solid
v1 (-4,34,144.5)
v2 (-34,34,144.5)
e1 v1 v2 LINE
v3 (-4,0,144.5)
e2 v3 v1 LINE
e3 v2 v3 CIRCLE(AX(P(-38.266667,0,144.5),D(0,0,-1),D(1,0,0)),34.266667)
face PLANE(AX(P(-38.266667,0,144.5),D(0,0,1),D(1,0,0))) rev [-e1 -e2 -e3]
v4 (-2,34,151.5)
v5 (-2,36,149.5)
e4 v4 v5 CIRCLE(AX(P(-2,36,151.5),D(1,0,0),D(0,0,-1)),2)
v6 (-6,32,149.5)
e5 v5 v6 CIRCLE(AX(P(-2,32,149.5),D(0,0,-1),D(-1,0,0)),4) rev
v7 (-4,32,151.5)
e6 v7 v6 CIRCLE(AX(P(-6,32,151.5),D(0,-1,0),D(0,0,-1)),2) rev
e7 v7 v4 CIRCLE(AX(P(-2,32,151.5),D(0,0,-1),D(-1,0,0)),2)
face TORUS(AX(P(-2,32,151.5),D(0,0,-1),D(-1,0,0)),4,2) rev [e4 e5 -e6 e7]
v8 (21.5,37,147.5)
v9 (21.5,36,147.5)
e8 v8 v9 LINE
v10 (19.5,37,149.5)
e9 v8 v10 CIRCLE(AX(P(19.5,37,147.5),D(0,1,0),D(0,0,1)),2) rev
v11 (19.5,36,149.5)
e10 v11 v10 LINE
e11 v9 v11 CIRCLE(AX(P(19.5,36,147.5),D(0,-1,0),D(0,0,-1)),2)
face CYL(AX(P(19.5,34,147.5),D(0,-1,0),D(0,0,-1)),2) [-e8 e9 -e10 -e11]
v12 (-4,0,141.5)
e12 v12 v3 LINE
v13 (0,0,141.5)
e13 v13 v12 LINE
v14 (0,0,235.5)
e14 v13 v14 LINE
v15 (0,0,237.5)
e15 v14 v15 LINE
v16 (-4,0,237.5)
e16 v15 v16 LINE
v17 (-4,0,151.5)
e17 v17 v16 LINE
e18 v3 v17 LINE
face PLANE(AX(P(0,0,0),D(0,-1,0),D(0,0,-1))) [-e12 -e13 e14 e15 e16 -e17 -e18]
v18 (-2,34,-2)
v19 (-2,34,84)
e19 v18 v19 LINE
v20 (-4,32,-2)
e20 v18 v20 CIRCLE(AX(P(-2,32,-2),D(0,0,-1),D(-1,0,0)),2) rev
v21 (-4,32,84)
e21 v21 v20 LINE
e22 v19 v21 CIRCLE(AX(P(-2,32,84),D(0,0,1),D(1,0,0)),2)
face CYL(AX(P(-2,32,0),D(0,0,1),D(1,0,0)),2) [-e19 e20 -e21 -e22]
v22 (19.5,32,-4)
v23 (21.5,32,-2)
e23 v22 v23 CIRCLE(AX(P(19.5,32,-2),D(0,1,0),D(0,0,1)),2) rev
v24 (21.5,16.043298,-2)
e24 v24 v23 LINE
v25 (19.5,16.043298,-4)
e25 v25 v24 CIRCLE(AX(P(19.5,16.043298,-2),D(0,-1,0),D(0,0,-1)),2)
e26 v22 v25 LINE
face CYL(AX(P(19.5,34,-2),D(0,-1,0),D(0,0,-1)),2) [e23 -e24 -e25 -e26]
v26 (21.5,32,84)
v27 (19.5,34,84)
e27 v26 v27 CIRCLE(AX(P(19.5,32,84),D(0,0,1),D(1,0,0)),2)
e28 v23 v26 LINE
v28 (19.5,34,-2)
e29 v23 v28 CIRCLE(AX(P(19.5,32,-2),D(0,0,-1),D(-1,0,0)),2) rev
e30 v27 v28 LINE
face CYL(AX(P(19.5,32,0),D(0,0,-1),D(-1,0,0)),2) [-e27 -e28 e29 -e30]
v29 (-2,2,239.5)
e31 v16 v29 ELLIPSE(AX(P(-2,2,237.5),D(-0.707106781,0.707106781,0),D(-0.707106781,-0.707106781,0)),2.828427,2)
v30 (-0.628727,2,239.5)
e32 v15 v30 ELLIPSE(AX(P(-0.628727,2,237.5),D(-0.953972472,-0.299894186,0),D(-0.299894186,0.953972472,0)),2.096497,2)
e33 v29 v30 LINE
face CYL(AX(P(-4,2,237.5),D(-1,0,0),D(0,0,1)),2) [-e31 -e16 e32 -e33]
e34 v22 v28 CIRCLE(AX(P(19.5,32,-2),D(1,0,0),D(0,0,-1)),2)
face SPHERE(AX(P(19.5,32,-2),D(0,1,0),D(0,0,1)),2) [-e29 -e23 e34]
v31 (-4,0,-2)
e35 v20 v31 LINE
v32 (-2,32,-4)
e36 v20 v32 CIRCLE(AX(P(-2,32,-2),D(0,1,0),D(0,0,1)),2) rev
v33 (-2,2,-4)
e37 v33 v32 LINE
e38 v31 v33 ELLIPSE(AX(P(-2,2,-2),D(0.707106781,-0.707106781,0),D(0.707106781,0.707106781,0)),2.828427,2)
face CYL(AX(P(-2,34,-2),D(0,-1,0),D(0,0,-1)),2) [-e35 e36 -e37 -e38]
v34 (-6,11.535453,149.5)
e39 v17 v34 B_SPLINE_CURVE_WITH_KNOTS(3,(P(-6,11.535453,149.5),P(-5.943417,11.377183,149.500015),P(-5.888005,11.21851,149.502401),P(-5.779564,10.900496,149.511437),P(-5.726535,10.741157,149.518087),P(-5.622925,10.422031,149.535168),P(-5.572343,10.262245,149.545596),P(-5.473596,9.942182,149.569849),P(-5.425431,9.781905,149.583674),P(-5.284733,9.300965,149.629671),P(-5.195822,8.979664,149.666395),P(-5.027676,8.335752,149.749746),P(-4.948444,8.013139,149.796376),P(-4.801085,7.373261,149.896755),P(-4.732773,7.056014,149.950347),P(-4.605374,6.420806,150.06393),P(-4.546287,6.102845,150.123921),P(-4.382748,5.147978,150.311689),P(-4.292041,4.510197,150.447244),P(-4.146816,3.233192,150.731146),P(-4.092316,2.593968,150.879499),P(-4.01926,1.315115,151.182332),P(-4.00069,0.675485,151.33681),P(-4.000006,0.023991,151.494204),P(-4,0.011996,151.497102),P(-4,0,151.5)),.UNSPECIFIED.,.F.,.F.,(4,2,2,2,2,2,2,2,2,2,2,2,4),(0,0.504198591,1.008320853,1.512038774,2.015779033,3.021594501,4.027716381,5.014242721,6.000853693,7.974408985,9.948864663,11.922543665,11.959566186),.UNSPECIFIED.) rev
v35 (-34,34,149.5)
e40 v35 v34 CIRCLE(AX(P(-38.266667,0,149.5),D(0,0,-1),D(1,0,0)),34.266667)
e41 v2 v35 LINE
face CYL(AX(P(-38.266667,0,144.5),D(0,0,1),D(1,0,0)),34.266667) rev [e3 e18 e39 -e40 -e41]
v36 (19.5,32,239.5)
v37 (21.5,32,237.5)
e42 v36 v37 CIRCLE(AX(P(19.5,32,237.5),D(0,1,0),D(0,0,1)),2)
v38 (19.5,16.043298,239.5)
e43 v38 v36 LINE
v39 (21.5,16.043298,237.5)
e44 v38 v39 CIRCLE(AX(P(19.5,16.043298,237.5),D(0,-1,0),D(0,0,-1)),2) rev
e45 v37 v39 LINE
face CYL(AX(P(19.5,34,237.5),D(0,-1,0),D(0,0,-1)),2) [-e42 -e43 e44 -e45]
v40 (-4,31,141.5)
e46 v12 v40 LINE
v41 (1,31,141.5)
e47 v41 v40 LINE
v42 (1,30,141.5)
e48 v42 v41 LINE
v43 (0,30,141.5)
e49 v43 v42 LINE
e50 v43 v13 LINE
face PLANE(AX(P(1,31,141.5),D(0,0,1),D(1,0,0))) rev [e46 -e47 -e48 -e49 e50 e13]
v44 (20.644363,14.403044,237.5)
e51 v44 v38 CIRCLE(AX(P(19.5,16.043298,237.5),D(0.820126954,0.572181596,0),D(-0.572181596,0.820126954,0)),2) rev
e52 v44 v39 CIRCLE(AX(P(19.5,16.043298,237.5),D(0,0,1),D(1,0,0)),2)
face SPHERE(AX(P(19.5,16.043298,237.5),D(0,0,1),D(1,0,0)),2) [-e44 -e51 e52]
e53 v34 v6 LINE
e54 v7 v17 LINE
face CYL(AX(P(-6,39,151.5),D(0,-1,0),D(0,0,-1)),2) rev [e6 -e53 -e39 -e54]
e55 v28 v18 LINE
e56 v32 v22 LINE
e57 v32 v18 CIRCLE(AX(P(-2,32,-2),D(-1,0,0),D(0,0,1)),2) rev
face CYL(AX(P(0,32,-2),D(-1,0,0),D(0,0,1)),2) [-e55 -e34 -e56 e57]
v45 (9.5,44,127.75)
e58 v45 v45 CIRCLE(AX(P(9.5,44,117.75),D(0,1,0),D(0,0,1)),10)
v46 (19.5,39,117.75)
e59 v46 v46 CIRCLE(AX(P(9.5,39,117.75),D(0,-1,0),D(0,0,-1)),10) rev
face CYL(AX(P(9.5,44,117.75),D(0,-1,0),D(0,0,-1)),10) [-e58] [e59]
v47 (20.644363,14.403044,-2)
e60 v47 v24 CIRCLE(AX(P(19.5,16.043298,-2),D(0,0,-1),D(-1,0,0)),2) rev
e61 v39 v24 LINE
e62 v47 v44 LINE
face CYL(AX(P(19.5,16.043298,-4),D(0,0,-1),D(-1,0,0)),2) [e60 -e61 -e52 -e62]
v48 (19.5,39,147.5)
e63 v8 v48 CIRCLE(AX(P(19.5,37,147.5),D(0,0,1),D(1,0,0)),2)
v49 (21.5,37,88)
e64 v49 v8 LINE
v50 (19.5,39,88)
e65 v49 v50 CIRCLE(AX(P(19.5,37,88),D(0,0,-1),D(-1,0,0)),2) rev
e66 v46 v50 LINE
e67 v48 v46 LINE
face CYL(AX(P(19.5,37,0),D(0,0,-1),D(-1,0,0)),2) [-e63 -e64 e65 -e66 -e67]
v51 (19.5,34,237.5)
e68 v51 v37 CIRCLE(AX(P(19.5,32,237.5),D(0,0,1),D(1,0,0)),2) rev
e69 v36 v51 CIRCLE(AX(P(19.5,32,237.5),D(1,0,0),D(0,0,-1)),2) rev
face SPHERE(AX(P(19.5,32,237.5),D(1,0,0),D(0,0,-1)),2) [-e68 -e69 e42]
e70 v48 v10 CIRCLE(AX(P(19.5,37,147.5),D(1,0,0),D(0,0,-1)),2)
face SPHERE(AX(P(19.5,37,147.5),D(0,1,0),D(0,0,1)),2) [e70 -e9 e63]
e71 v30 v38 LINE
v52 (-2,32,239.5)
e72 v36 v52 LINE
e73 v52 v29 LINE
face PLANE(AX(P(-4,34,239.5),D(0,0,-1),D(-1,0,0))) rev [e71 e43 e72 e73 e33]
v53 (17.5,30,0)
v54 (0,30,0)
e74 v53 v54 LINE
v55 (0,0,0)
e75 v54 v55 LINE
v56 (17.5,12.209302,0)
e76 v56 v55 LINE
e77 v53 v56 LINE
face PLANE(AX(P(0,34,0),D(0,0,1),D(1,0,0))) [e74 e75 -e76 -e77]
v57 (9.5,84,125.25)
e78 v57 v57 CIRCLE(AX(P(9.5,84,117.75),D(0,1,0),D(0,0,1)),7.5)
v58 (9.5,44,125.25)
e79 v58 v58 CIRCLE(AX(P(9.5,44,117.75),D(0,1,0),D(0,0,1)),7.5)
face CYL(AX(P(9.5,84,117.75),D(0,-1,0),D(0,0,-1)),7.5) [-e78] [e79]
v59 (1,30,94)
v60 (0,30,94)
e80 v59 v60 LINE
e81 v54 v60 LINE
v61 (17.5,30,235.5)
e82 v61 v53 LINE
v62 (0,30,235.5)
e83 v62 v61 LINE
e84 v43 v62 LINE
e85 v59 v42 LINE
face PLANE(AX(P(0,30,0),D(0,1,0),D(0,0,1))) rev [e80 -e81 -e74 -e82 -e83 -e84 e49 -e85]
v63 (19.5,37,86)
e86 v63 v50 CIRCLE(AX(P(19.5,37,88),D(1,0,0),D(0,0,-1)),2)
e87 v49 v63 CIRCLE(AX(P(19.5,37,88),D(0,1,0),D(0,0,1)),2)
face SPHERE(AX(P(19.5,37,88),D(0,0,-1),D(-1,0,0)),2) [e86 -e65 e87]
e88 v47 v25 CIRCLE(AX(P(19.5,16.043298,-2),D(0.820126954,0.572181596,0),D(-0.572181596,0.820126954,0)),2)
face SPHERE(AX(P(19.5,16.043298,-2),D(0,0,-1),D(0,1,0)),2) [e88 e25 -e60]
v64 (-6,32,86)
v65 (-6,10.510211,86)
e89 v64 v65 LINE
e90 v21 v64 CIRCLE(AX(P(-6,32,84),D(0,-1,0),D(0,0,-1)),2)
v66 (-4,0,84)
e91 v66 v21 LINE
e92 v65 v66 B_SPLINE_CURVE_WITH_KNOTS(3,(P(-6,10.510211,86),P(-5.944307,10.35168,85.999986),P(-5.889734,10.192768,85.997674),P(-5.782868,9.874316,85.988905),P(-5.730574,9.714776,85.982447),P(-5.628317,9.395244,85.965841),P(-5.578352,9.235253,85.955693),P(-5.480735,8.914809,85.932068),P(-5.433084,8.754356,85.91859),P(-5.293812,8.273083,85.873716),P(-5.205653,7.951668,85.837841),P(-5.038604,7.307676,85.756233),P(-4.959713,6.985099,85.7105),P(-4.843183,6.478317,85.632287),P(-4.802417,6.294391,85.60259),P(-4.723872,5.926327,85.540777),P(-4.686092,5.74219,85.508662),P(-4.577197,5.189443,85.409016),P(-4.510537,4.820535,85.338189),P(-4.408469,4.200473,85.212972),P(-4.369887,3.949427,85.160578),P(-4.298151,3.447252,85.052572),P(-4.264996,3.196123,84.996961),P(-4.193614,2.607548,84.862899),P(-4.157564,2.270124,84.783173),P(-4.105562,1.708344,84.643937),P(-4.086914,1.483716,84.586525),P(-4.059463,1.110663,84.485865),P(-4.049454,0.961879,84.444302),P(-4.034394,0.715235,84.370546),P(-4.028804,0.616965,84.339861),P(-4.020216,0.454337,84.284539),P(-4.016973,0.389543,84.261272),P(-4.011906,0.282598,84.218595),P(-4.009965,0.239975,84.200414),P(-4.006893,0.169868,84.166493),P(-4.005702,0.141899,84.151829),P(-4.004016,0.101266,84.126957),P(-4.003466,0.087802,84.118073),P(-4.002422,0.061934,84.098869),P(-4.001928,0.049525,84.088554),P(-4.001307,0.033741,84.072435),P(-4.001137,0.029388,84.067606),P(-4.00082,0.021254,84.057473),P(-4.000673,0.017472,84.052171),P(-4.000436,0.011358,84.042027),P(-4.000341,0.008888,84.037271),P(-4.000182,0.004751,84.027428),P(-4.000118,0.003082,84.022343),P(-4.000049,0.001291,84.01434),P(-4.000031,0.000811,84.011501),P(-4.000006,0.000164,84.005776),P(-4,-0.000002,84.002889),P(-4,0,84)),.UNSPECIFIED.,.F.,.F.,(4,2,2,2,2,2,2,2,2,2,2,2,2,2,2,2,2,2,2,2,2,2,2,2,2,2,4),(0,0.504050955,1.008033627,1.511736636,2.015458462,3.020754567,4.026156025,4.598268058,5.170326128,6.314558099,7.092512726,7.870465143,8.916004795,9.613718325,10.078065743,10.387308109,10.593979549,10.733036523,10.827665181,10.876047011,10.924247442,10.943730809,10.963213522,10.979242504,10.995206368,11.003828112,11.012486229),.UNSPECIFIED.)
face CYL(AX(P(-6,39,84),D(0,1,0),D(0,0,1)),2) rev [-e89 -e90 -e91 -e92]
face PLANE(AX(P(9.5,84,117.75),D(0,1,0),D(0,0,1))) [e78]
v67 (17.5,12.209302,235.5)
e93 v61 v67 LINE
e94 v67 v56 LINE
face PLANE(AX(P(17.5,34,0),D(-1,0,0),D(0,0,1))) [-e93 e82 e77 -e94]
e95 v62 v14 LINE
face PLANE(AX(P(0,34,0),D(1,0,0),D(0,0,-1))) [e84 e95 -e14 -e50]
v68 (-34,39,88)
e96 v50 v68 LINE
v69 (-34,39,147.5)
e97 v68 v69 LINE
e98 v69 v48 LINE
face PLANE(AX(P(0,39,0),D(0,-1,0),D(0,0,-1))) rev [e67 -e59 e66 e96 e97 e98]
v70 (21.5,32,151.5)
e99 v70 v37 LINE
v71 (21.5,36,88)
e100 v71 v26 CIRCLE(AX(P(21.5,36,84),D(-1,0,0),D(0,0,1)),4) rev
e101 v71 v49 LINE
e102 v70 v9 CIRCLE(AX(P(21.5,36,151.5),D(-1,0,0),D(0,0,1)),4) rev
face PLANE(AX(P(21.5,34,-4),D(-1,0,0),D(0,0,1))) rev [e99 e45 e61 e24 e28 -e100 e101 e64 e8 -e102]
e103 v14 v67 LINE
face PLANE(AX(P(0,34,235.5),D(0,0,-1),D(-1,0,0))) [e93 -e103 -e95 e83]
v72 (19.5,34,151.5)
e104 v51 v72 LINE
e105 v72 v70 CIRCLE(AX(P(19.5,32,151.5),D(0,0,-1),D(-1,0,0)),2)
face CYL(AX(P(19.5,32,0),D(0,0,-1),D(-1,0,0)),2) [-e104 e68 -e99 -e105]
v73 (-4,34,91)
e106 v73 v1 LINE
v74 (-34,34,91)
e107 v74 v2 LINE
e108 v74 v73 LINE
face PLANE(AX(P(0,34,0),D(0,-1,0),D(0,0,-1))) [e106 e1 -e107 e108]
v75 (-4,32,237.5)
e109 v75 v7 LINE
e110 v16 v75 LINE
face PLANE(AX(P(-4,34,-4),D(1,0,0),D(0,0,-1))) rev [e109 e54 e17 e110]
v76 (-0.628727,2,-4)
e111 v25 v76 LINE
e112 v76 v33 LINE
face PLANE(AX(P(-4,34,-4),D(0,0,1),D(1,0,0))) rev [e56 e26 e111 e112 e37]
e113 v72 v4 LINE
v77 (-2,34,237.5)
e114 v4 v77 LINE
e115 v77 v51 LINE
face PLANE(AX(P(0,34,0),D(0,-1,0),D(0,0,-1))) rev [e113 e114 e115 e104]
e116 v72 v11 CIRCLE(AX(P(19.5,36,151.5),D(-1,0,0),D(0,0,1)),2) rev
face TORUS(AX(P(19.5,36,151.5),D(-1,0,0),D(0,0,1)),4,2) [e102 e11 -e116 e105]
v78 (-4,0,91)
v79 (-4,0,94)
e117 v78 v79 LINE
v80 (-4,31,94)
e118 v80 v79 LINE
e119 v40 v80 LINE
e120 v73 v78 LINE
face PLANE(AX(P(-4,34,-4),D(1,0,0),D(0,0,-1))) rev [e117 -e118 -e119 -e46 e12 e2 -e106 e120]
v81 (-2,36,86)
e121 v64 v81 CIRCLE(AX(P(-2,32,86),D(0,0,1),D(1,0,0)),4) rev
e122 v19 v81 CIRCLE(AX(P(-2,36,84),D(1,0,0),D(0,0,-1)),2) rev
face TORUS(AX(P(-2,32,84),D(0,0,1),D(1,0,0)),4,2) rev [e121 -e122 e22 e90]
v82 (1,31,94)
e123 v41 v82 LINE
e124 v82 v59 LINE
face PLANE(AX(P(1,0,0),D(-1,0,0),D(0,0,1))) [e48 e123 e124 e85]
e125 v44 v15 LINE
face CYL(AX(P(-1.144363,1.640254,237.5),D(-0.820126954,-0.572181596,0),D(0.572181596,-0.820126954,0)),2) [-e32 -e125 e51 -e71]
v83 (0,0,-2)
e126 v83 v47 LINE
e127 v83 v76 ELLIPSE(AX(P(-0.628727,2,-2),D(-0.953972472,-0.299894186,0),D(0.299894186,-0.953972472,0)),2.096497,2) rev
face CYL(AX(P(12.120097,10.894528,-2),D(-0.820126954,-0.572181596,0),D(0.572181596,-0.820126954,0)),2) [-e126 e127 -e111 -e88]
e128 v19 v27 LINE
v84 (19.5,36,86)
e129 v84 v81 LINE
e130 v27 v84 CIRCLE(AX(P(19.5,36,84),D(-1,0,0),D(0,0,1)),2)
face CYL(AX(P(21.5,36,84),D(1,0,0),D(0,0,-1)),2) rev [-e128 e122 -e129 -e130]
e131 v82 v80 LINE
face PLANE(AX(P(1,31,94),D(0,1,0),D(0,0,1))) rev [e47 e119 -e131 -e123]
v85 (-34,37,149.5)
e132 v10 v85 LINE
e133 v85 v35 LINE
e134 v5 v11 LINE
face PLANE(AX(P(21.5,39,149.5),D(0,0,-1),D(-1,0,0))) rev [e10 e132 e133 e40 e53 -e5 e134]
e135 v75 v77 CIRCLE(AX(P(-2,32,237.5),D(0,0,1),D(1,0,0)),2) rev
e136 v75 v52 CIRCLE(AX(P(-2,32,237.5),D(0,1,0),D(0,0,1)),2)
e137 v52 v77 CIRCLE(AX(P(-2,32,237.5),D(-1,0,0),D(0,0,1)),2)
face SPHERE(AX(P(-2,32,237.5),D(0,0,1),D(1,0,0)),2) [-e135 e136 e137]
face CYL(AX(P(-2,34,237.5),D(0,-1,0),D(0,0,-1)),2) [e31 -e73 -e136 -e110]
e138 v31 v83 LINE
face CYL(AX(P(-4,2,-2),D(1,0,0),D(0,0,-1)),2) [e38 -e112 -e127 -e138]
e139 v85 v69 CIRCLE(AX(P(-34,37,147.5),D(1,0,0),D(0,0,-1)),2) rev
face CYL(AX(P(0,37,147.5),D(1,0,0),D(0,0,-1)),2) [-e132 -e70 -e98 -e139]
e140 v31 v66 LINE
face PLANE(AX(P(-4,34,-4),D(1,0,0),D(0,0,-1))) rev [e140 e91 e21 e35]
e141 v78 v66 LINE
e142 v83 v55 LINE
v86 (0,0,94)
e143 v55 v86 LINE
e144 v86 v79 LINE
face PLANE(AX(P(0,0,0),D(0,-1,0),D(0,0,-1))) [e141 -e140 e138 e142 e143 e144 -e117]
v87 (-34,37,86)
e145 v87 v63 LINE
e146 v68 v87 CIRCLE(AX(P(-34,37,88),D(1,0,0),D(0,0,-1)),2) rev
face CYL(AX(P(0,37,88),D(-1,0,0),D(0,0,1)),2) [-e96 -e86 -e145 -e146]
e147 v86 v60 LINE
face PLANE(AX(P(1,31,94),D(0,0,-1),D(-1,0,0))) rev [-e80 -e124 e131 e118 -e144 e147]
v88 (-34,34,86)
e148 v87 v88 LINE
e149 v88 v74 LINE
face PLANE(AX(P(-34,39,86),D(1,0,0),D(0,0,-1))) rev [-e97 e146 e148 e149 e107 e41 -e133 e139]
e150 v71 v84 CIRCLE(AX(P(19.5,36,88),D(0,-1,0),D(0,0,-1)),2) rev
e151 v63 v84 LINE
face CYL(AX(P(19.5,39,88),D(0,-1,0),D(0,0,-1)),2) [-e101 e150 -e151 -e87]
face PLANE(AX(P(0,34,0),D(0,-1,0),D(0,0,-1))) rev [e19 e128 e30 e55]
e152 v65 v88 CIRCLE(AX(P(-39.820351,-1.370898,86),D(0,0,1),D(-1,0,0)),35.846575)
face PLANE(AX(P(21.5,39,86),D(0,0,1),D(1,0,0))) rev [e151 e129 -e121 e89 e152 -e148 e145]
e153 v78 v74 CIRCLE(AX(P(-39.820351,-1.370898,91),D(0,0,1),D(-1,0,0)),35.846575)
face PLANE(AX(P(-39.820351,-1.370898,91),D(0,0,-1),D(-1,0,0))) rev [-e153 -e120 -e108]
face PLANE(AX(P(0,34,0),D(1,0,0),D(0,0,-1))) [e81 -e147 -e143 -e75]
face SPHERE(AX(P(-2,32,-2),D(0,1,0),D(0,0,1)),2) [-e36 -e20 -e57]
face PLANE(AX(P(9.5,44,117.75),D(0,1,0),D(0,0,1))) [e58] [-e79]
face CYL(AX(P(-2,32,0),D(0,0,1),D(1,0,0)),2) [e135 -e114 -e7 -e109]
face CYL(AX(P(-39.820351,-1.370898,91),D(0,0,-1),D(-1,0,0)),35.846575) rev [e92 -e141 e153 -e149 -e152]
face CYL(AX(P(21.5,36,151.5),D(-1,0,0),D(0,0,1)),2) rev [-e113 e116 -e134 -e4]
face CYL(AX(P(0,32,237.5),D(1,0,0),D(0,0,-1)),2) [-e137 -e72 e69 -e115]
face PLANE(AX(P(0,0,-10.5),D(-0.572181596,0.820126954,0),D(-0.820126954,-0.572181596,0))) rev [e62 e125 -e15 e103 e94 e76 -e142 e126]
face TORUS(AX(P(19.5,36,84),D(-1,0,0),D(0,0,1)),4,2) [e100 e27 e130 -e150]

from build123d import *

# Parameters (mm, degrees)
SKETCH1_W                         = 25.5
SKETCH1_H                         = 243.5
SKETCH1_W_2                       = 17.5
SKETCH1_H_2                       = 235.5
MOTOR_PANEL_CONNECTOR_DEPTH       = 34
SKETCH3_W                         = 25.5
SKETCH3_H                         = 243.5
MOTOR_PANEL_CONNECCTOR_BASE_DEPTH = 4
UP_DOWN_CONNECT_CUT_DEPTH         = 250
SKETCH5_W                         = 47.5
SKETCH5_H                         = 31
CUT_TO_NAIL_PART_DEPTH            = 5
SKETCH6_W                         = 55.5
SKETCH6_H                         = 63.5
PANEL_CONNECTOR_DEPTH             = 5
SKETCH7_R                         = 10
BOSS_EXTRUDE4_DEPTH               = 5
BOSS_EXTRUDE5_DEPTH               = 5
BOSS_EXTRUDE6_DEPTH               = 5
SKETCH14_R                        = 7.5
BOSS_EXTRUDE7_DEPTH               = 40
FILLET3_R                         = 2


with BuildPart() as part:
    # Sketch1 → motor -panel connector (new body)
    with BuildSketch(Plane(origin=(0, 0, 0), x_dir=(1, 0, 0), z_dir=(0, 1, 0))):
        with Locations((8.75, -117.75)):
            Rectangle(SKETCH1_W, SKETCH1_H)
        with Locations((8.75, -117.75)):
            Rectangle(SKETCH1_W_2, SKETCH1_H_2, mode=Mode.SUBTRACT)
    extrude(amount=MOTOR_PANEL_CONNECTOR_DEPTH)

    # Sketch3 → motor-panel connecctor base (add)
    with BuildSketch(Plane(origin=(0, 34, 0), x_dir=(1, 0, 0), z_dir=(0, 1, 0))):
        with Locations((8.75, -117.75)):
            Rectangle(SKETCH3_W, SKETCH3_H)
    extrude(amount=-MOTOR_PANEL_CONNECCTOR_BASE_DEPTH)

    # Sketch4 → up down connect cut (cut)
    with BuildSketch(Plane.XY.offset(239.5)):
        Polygon((0, 0), (21.5, 15), (21.5, 0), align=None)
    extrude(amount=-UP_DOWN_CONNECT_CUT_DEPTH, mode=Mode.SUBTRACT)

    # Sketch5 → cut to nail part (cut)
    with BuildSketch(Plane.ZY.offset(4)):
        with Locations((117.75, 15.5)):
            Rectangle(SKETCH5_W, SKETCH5_H)
    extrude(amount=-CUT_TO_NAIL_PART_DEPTH, mode=Mode.SUBTRACT)

    # Sketch6 → panel connector (add)
    with BuildSketch(Plane(origin=(0, 34, 0), x_dir=(1, 0, 0), z_dir=(0, 1, 0))):
        with Locations((-6.25, -117.75)):
            Rectangle(SKETCH6_W, SKETCH6_H)
    extrude(amount=PANEL_CONNECTOR_DEPTH)

    # Sketch7 → Boss-Extrude4 (add)
    with BuildSketch(Plane(origin=(0, 39, 0), x_dir=(1, 0, 0), z_dir=(0, 1, 0))):
        with Locations(Location((9.5, -117.75, 0), (0, 0, 90))):
            Circle(SKETCH7_R)
    extrude(amount=BOSS_EXTRUDE4_DEPTH)

    # Sketch8 → Boss-Extrude5 (add)
    with BuildSketch(Plane.XY.offset(149.5)):
        with BuildLine():
            Line((-34, 34), (-4, 34))
            Line((-4, 34), (-4, 0))
            ThreePointArc((-4, 0), (-12.572222823, 22.671568098), (-34, 34))
        make_face()
    extrude(amount=-BOSS_EXTRUDE5_DEPTH)

    # Sketch13 → Boss-Extrude6 (add)
    with BuildSketch(Plane(origin=(0, 0, 86), x_dir=(-1, 0, 0), z_dir=(0, 0, -1))):
        with BuildLine():
            Line((4, 0), (4, 34))
            Line((4, 34), (34, 34))
            ThreePointArc((34, 34), (12.941232514, 22.345971311), (4, 0))
        make_face()
    extrude(amount=-BOSS_EXTRUDE6_DEPTH)

    # Sketch14 → Boss-Extrude7 (add)
    with BuildSketch(Plane(origin=(0, 44, 0), x_dir=(1, 0, 0), z_dir=(0, 1, 0))):
        with Locations(Location((9.5, -117.75, 0), (0, 0, 270))):
            Circle(SKETCH14_R)
    extrude(amount=BOSS_EXTRUDE7_DEPTH)

    # Fillet3
    # the kernel refuses this fillet: 2 mm, written as the material it takes off along each edge
    with BuildSketch(Plane(origin=(-2, 32, 237.5), x_dir=(-1, 0, 0), z_dir=(0, 1, 0))) as fillet3_piece_1_section:
        Polygon((0, 0), (FILLET3_R * 1.02, 0), (FILLET3_R * 1.02, FILLET3_R * 1.02), (0, FILLET3_R * 1.02), align=None)
    fillet3_piece_1 = extrude(amount=FILLET3_R * 1.02, mode=Mode.PRIVATE)
    fillet3_piece_1 = fillet3_piece_1 - Plane(origin=(-2, 32, 237.5), x_dir=(0.7071067811865475, 0, -0.7071067811865475), z_dir=(0, 1, 0)) * Sphere(FILLET3_R, mode=Mode.PRIVATE)
    add(fillet3_piece_1, mode=Mode.SUBTRACT)
    with BuildSketch(Plane(origin=(-2, 32, -2), x_dir=(0, 1, 0), z_dir=(-1, 0, 0))) as fillet3_piece_2_section:
        Polygon((0, 0), (FILLET3_R * 1.02, 0), (FILLET3_R * 1.02, FILLET3_R * 1.02), (0, FILLET3_R * 1.02), align=None)
    fillet3_piece_2 = extrude(amount=FILLET3_R * 1.02, mode=Mode.PRIVATE)
    fillet3_piece_2 = fillet3_piece_2 - Plane(origin=(-2, 32, -2), x_dir=(0, -0.7071067811865475, 0.7071067811865475), z_dir=(-1, 0, 0)) * Sphere(FILLET3_R, mode=Mode.PRIVATE)
    add(fillet3_piece_2, mode=Mode.SUBTRACT)
    with BuildSketch(Plane(origin=(19.5, 16.043297996, 237.5), x_dir=(0.5721815960240814, -0.8201269543011832, 0), z_dir=(0, 0, 1))) as fillet3_piece_3_section:
        Polygon((0, 0), (FILLET3_R * 1.02, 0), (FILLET3_R * 1.02, FILLET3_R * 0.532081978), (FILLET3_R * 0.583625227945, FILLET3_R * 0.836529493387), align=None)
    fillet3_piece_3 = extrude(amount=FILLET3_R * 1.02, mode=Mode.PRIVATE)
    fillet3_piece_3 = fillet3_piece_3 - Plane(origin=(19.5, 16.043297996, 237.5), x_dir=(-0.886617616569872, 0.4625031913273241, 0), z_dir=(0, 0, 1)) * Sphere(FILLET3_R, mode=Mode.PRIVATE)
    add(fillet3_piece_3, mode=Mode.SUBTRACT)
    with BuildSketch(Plane(origin=(19.5, 16.043297996, -2), x_dir=(0.5721815960240814, -0.8201269543011832, 0), z_dir=(0, 0, -1))) as fillet3_piece_4_section:
        Polygon((0, 0), (FILLET3_R * 1.02, 0), (FILLET3_R * 1.02, -FILLET3_R * 0.532081978), (FILLET3_R * 0.583625227945, -FILLET3_R * 0.836529493387), align=None)
    fillet3_piece_4 = extrude(amount=FILLET3_R * 1.02, mode=Mode.PRIVATE)
    fillet3_piece_4 = fillet3_piece_4 - Plane(origin=(19.5, 16.043297996, -2), x_dir=(-0.886617616569872, 0.4625031913273241, 0), z_dir=(0, 0, -1)) * Sphere(FILLET3_R, mode=Mode.PRIVATE)
    add(fillet3_piece_4, mode=Mode.SUBTRACT)
    with BuildSketch(Plane(origin=(21.5, 39, 154.5), x_dir=(0, -1, 0), z_dir=(0, 0, -1))) as fillet3_piece_5:
        with BuildLine():
            CenterArc((FILLET3_R, FILLET3_R), FILLET3_R, 180, 90)
            Line((0, FILLET3_R), (0, 0))
            Line((0, 0), (FILLET3_R, 0))
        make_face()
    extrude(amount=73.5, mode=Mode.SUBTRACT)
    with BuildSketch(Plane(origin=(26.5, 39, 86), x_dir=(0, -1, 0), z_dir=(-1, 0, 0))) as fillet3_piece_6:
        with BuildLine():
            CenterArc((FILLET3_R, FILLET3_R), FILLET3_R, 180, 90)
            Line((0, FILLET3_R), (0, 0))
            Line((0, 0), (FILLET3_R, 0))
        make_face()
    extrude(amount=65.5, mode=Mode.SUBTRACT)
    with BuildSketch(Plane(origin=(-39, 39, 149.5), x_dir=(0, 0, -1), z_dir=(1, 0, 0))) as fillet3_piece_7:
        with BuildLine():
            CenterArc((FILLET3_R, -FILLET3_R), FILLET3_R, 90, 90)
            Line((0, -FILLET3_R), (0, 0))
            Line((0, 0), (FILLET3_R, 0))
        make_face()
    extrude(amount=65.5, mode=Mode.SUBTRACT)
    with BuildSketch(Plane(origin=(-2, 34, 239.5), x_dir=(0, -1, 0), z_dir=(1, 0, 0))) as fillet3_piece_8:
        with BuildLine():
            CenterArc((FILLET3_R, FILLET3_R), FILLET3_R, 180, 90)
            Line((0, FILLET3_R), (0, 0))
            Line((0, 0), (FILLET3_R, 0))
        make_face()
    extrude(amount=28.5, mode=Mode.SUBTRACT)
    with BuildSketch(Plane(origin=(26.5, 34, -4), x_dir=(0, 0, 1), z_dir=(-1, 0, 0))) as fillet3_piece_9:
        with BuildLine():
            CenterArc((FILLET3_R, -FILLET3_R), FILLET3_R, 90, 90)
            Line((0, -FILLET3_R), (0, 0))
            Line((0, 0), (FILLET3_R, 0))
        make_face()
    extrude(amount=28.5, mode=Mode.SUBTRACT)
    with BuildSketch(Plane(origin=(21.5, 15, 237.5), x_dir=(-0.8201269543011818, -0.5721815960240832, 0), z_dir=(0, 0, -1))) as fillet3_piece_10:
        with BuildLine():
            CenterArc((FILLET3_R * 0.521648998039, FILLET3_R), FILLET3_R, 214.902495616, 55.097504384)
            Line((-FILLET3_R * 0.298477956262, FILLET3_R * 0.427818403976), (0, 0))
            Line((0, 0), (FILLET3_R * 0.521648998039, 0))
        make_face()
    extrude(amount=239.5, mode=Mode.SUBTRACT)
    with BuildSketch(Plane(origin=(-9, 0, 239.5), x_dir=(0, 1, 0), z_dir=(1, 0, 0))) as fillet3_piece_11:
        with BuildLine():
            CenterArc((FILLET3_R, -FILLET3_R), FILLET3_R, 90, 90)
            Line((0, -FILLET3_R), (0, 0))
            Line((0, 0), (FILLET3_R, 0))
        make_face()
    extrude(amount=14, mode=Mode.SUBTRACT)
    with BuildSketch(Plane(origin=(5, 0, -4), x_dir=(0, 0, 1), z_dir=(-1, 0, 0))) as fillet3_piece_12:
        with BuildLine():
            CenterArc((FILLET3_R, FILLET3_R), FILLET3_R, 180, 90)
            Line((0, FILLET3_R), (0, 0))
            Line((0, 0), (FILLET3_R, 0))
        make_face()
    extrude(amount=14, mode=Mode.SUBTRACT)
    with BuildSketch(Plane(origin=(-4.100634772, -2.86090798, -4), x_dir=(-0.5721815960240814, 0.8201269543011832, 0), z_dir=(0.8201269543011832, 0.5721815960240814, 0)), Plane(origin=(-4.100634772, -2.86090798, 239.5), x_dir=(0, 0, -1), z_dir=(0.8201269543011832, 0.5721815960240814, 0))) as fillet3_piece_13:
        with BuildLine():
            CenterArc((FILLET3_R, FILLET3_R), FILLET3_R, 180, 90)
            Line((0, FILLET3_R), (0, 0))
            Line((0, 0), (FILLET3_R, 0))
        make_face()
    extrude(amount=30.172155462, mode=Mode.SUBTRACT)
    with BuildSketch(Plane(origin=(21.5, 39, -4), x_dir=(-1, 0, 0), z_dir=(0, -1, 0))) as fillet3_piece_14:
        with BuildLine():
            CenterArc((FILLET3_R, -FILLET3_R), FILLET3_R, 90, 90)
            Line((0, -FILLET3_R), (0, 0))
            Line((0, 0), (FILLET3_R, 0))
        make_face()
    extrude(amount=22.956702004, mode=Mode.SUBTRACT)
    with BuildSketch(Plane(origin=(21.5, 16.043297996, 239.5), x_dir=(0, 0, -1), z_dir=(0, 1, 0))) as fillet3_piece_15:
        with BuildLine():
            CenterArc((FILLET3_R, FILLET3_R), FILLET3_R, 180, 90)
            Line((0, FILLET3_R), (0, 0))
            Line((0, 0), (FILLET3_R, 0))
        make_face()
    extrude(amount=22.956702004, mode=Mode.SUBTRACT)
    with BuildSketch(Plane(origin=(-4, -5, 239.5), x_dir=(1, 0, 0), z_dir=(0, 1, 0))) as fillet3_piece_16:
        with BuildLine():
            CenterArc((FILLET3_R, FILLET3_R), FILLET3_R, 180, 90)
            Line((0, FILLET3_R), (0, 0))
            Line((0, 0), (FILLET3_R, 0))
        make_face()
    extrude(amount=37, mode=Mode.SUBTRACT)
    with BuildSketch(Plane(origin=(-4, 32, -4), x_dir=(0, 0, 1), z_dir=(0, -1, 0))) as fillet3_piece_17:
        with BuildLine():
            CenterArc((FILLET3_R, -FILLET3_R), FILLET3_R, 90, 90)
            Line((0, -FILLET3_R), (0, 0))
            Line((0, 0), (FILLET3_R, 0))
        make_face()
    extrude(amount=37, mode=Mode.SUBTRACT)
    with BuildSketch(Plane(origin=(-4, 34, -2), x_dir=(0, -1, 0), z_dir=(0, 0, 1))) as fillet3_piece_18:
        with BuildLine():
            CenterArc((FILLET3_R, FILLET3_R), FILLET3_R, 180, 90)
            Line((0, FILLET3_R), (0, 0))
            Line((0, 0), (FILLET3_R, 0))
        make_face()
    extrude(amount=88, mode=Mode.SUBTRACT)
    with BuildSketch(Plane(origin=(-4, 34, 149.5), x_dir=(1, 0, 0), z_dir=(0, 0, 1))) as fillet3_piece_19:
        with BuildLine():
            CenterArc((FILLET3_R, -FILLET3_R), FILLET3_R, 90, 90)
            Line((0, -FILLET3_R), (0, 0))
            Line((0, 0), (FILLET3_R, 0))
        make_face()
    extrude(amount=88, mode=Mode.SUBTRACT)
    # the kernel refuses this fillet: 2 mm, written as the material it adds along each edge
    with BuildSketch(Plane(origin=(-4, 32, 149.5), x_dir=(-1, 0, 0), z_dir=(0, -1, 0))) as fillet3_2_piece_1_section:
        with BuildLine():
            CenterArc((FILLET3_R, -FILLET3_R), FILLET3_R, 90, 90)
            Line((0, -FILLET3_R), (0, 0))
            Line((0, 0), (FILLET3_R, 0))
        make_face()
    fillet3_2_piece_1 = extrude(amount=32, mode=Mode.PRIVATE)
    fillet3_2_piece_1 = fillet3_2_piece_1 - Plane(origin=(-38.266666667, 0, 149.967222139), x_dir=(1, 0, 0), z_dir=(0, 0, 1)) * Cylinder(34.266666667, 72, mode=Mode.PRIVATE)
    add(fillet3_2_piece_1)
    with BuildSketch(Plane(origin=(-4, 0, 86), x_dir=(0, 0, -1), z_dir=(0, 1, 0))) as fillet3_2_piece_2_section:
        with BuildLine():
            CenterArc((FILLET3_R, FILLET3_R), FILLET3_R, 180, 90)
            Line((0, FILLET3_R), (0, 0))
            Line((0, 0), (FILLET3_R, 0))
        make_face()
    fillet3_2_piece_2 = extrude(amount=32, mode=Mode.PRIVATE)
    fillet3_2_piece_2 = fillet3_2_piece_2 - Plane(origin=(-39.820351429, -1.370898319, 85.534344582), x_dir=(0.16236841120732118, 0.9867302058019762, 0), z_dir=(0, 0, -1)) * Cylinder(35.846574992, 73, mode=Mode.PRIVATE)
    add(fillet3_2_piece_2)
    with BuildSketch(Plane(origin=(-2, 34, 149.5), x_dir=(0, 1, 0), z_dir=(1, 0, 0)), Plane(origin=(21.5, 34, 86), x_dir=(0, 1, 0), z_dir=(-1, 0, 0))) as fillet3_2_piece_3:
        with BuildLine():
            CenterArc((FILLET3_R, FILLET3_R), FILLET3_R, 180, 90)
            Line((0, FILLET3_R), (0, 0))
            Line((0, 0), (FILLET3_R, 0))
        make_face()
    extrude(amount=23.5)
    with BuildSketch(Plane(origin=(-2, 32, 86), x_dir=(-1, 0, 0), z_dir=(0, -1, 0))) as fillet3_2_piece_4:
        with BuildLine():
            CenterArc((2 + FILLET3_R, FILLET3_R), FILLET3_R, 180, 90)
            Line((2, FILLET3_R), (2, 0))
            Line((2, 0), (2 + FILLET3_R, 0))
        make_face()
    revolve(axis=Axis((-2, 32, 86), (0, 0, -1)), revolution_arc=90)
    with BuildSketch(Plane(origin=(-2, 32, 149.5), x_dir=(0, 1, 0), z_dir=(1, 0, 0))) as fillet3_2_piece_5:
        with BuildLine():
            CenterArc((2 + FILLET3_R, FILLET3_R), FILLET3_R, 180, 90)
            Line((2, FILLET3_R), (2, 0))
            Line((2, 0), (2 + FILLET3_R, 0))
        make_face()
    revolve(axis=Axis((-2, 32, 149.5), (0, 0, 1)), revolution_arc=90)
    # the kernel refuses this fillet: 2 mm, written as the material it takes off along each edge
    with BuildSketch(Plane(origin=(19.5, 37, 88), x_dir=(0, 0, -1), z_dir=(1, 0, 0))) as fillet3_3_piece_1_section:
        Polygon((0, 0), (FILLET3_R * 1.02, 0), (FILLET3_R * 1.02, FILLET3_R * 1.02), (0, FILLET3_R * 1.02), align=None)
    fillet3_3_piece_1 = extrude(amount=FILLET3_R * 1.02, mode=Mode.PRIVATE)
    fillet3_3_piece_1 = fillet3_3_piece_1 - Plane(origin=(19.5, 37, 88), x_dir=(0, -0.7071067811865475, 0.7071067811865475), z_dir=(1, 0, 0)) * Sphere(FILLET3_R, mode=Mode.PRIVATE)
    add(fillet3_3_piece_1, mode=Mode.SUBTRACT)
    with BuildSketch(Plane(origin=(19.5, 37, 147.5), x_dir=(0, 0, 1), z_dir=(1, 0, 0))) as fillet3_3_piece_2_section:
        Polygon((0, 0), (FILLET3_R * 1.02, 0), (FILLET3_R * 1.02, -FILLET3_R * 1.02), (0, -FILLET3_R * 1.02), align=None)
    fillet3_3_piece_2 = extrude(amount=FILLET3_R * 1.02, mode=Mode.PRIVATE)
    fillet3_3_piece_2 = fillet3_3_piece_2 - Plane(origin=(19.5, 37, 147.5), x_dir=(0, -0.7071067811865475, -0.7071067811865475), z_dir=(1, 0, 0)) * Sphere(FILLET3_R, mode=Mode.PRIVATE)
    add(fillet3_3_piece_2, mode=Mode.SUBTRACT)
    with BuildSketch(Plane(origin=(19.5, 32, -2), x_dir=(0, 1, 0), z_dir=(1, 0, 0))) as fillet3_3_piece_3_section:
        Polygon((0, 0), (FILLET3_R * 1.02, 0), (FILLET3_R * 1.02, -FILLET3_R * 1.02), (0, -FILLET3_R * 1.02), align=None)
    fillet3_3_piece_3 = extrude(amount=FILLET3_R * 1.02, mode=Mode.PRIVATE)
    fillet3_3_piece_3 = fillet3_3_piece_3 - Plane(origin=(19.5, 32, -2), x_dir=(0, -0.7071067811865475, 0.7071067811865475), z_dir=(1, 0, 0)) * Sphere(FILLET3_R, mode=Mode.PRIVATE)
    add(fillet3_3_piece_3, mode=Mode.SUBTRACT)
    with BuildSketch(Plane(origin=(19.5, 32, 237.5), x_dir=(0, 1, 0), z_dir=(1, 0, 0))) as fillet3_3_piece_4_section:
        Polygon((0, 0), (FILLET3_R * 1.02, 0), (FILLET3_R * 1.02, FILLET3_R * 1.02), (0, FILLET3_R * 1.02), align=None)
    fillet3_3_piece_4 = extrude(amount=FILLET3_R * 1.02, mode=Mode.PRIVATE)
    fillet3_3_piece_4 = fillet3_3_piece_4 - Plane(origin=(19.5, 32, 237.5), x_dir=(0, -0.7071067811865475, -0.7071067811865475), z_dir=(1, 0, 0)) * Sphere(FILLET3_R, mode=Mode.PRIVATE)
    add(fillet3_3_piece_4, mode=Mode.SUBTRACT)
    with BuildSketch(Plane(origin=(21.5, 34, 237.5), x_dir=(0, -1, 0), z_dir=(0, 0, -1)), Plane(origin=(21.5, 34, 84), x_dir=(0, -1, 0), z_dir=(0, 0, -1))) as fillet3_3_piece_5:
        with BuildLine():
            CenterArc((FILLET3_R, FILLET3_R), FILLET3_R, 180, 90)
            Line((0, FILLET3_R), (0, 0))
            Line((0, 0), (FILLET3_R, 0))
        make_face()
    extrude(amount=86, mode=Mode.SUBTRACT)
    with BuildSketch(Plane(origin=(21.5, 36, 149.5), x_dir=(0, 0, -1), z_dir=(0, 1, 0))) as fillet3_3_piece_6:
        with BuildLine():
            CenterArc((FILLET3_R, FILLET3_R), FILLET3_R, 180, 90)
            Line((0, FILLET3_R), (0, 0))
            Line((0, 0), (FILLET3_R, 0))
        make_face()
    extrude(amount=1, mode=Mode.SUBTRACT)
    with BuildSketch(Plane(origin=(21.5, 36, 86), x_dir=(0, 0, 1), z_dir=(0, 1, 0))) as fillet3_3_piece_7:
        with BuildLine():
            CenterArc((FILLET3_R, -FILLET3_R), FILLET3_R, 90, 90)
            Line((0, -FILLET3_R), (0, 0))
            Line((0, 0), (FILLET3_R, 0))
        make_face()
    extrude(amount=1, mode=Mode.SUBTRACT)
    with BuildSketch(Plane(origin=(21.5, 36, 84), x_dir=(0, 0, 1), z_dir=(0, 1, 0))) as fillet3_3_piece_8:
        with BuildLine():
            CenterArc((2 + FILLET3_R, -FILLET3_R), FILLET3_R, 90, 90)
            Line((2, -FILLET3_R), (2, 0))
            Line((2, 0), (2 + FILLET3_R, 0))
        make_face()
    revolve(axis=Axis((21.5, 36, 84), (1, 0, 0)), revolution_arc=90, mode=Mode.SUBTRACT)
    with BuildSketch(Plane(origin=(21.5, 36, 151.5), x_dir=(0, 0, -1), z_dir=(0, 1, 0))) as fillet3_3_piece_9:
        with BuildLine():
            CenterArc((2 + FILLET3_R, FILLET3_R), FILLET3_R, 180, 90)
            Line((2, FILLET3_R), (2, 0))
            Line((2, 0), (2 + FILLET3_R, 0))
        make_face()
    revolve(axis=Axis((21.5, 36, 151.5), (-1, 0, 0)), revolution_arc=90, mode=Mode.SUBTRACT)


solid = part.part
